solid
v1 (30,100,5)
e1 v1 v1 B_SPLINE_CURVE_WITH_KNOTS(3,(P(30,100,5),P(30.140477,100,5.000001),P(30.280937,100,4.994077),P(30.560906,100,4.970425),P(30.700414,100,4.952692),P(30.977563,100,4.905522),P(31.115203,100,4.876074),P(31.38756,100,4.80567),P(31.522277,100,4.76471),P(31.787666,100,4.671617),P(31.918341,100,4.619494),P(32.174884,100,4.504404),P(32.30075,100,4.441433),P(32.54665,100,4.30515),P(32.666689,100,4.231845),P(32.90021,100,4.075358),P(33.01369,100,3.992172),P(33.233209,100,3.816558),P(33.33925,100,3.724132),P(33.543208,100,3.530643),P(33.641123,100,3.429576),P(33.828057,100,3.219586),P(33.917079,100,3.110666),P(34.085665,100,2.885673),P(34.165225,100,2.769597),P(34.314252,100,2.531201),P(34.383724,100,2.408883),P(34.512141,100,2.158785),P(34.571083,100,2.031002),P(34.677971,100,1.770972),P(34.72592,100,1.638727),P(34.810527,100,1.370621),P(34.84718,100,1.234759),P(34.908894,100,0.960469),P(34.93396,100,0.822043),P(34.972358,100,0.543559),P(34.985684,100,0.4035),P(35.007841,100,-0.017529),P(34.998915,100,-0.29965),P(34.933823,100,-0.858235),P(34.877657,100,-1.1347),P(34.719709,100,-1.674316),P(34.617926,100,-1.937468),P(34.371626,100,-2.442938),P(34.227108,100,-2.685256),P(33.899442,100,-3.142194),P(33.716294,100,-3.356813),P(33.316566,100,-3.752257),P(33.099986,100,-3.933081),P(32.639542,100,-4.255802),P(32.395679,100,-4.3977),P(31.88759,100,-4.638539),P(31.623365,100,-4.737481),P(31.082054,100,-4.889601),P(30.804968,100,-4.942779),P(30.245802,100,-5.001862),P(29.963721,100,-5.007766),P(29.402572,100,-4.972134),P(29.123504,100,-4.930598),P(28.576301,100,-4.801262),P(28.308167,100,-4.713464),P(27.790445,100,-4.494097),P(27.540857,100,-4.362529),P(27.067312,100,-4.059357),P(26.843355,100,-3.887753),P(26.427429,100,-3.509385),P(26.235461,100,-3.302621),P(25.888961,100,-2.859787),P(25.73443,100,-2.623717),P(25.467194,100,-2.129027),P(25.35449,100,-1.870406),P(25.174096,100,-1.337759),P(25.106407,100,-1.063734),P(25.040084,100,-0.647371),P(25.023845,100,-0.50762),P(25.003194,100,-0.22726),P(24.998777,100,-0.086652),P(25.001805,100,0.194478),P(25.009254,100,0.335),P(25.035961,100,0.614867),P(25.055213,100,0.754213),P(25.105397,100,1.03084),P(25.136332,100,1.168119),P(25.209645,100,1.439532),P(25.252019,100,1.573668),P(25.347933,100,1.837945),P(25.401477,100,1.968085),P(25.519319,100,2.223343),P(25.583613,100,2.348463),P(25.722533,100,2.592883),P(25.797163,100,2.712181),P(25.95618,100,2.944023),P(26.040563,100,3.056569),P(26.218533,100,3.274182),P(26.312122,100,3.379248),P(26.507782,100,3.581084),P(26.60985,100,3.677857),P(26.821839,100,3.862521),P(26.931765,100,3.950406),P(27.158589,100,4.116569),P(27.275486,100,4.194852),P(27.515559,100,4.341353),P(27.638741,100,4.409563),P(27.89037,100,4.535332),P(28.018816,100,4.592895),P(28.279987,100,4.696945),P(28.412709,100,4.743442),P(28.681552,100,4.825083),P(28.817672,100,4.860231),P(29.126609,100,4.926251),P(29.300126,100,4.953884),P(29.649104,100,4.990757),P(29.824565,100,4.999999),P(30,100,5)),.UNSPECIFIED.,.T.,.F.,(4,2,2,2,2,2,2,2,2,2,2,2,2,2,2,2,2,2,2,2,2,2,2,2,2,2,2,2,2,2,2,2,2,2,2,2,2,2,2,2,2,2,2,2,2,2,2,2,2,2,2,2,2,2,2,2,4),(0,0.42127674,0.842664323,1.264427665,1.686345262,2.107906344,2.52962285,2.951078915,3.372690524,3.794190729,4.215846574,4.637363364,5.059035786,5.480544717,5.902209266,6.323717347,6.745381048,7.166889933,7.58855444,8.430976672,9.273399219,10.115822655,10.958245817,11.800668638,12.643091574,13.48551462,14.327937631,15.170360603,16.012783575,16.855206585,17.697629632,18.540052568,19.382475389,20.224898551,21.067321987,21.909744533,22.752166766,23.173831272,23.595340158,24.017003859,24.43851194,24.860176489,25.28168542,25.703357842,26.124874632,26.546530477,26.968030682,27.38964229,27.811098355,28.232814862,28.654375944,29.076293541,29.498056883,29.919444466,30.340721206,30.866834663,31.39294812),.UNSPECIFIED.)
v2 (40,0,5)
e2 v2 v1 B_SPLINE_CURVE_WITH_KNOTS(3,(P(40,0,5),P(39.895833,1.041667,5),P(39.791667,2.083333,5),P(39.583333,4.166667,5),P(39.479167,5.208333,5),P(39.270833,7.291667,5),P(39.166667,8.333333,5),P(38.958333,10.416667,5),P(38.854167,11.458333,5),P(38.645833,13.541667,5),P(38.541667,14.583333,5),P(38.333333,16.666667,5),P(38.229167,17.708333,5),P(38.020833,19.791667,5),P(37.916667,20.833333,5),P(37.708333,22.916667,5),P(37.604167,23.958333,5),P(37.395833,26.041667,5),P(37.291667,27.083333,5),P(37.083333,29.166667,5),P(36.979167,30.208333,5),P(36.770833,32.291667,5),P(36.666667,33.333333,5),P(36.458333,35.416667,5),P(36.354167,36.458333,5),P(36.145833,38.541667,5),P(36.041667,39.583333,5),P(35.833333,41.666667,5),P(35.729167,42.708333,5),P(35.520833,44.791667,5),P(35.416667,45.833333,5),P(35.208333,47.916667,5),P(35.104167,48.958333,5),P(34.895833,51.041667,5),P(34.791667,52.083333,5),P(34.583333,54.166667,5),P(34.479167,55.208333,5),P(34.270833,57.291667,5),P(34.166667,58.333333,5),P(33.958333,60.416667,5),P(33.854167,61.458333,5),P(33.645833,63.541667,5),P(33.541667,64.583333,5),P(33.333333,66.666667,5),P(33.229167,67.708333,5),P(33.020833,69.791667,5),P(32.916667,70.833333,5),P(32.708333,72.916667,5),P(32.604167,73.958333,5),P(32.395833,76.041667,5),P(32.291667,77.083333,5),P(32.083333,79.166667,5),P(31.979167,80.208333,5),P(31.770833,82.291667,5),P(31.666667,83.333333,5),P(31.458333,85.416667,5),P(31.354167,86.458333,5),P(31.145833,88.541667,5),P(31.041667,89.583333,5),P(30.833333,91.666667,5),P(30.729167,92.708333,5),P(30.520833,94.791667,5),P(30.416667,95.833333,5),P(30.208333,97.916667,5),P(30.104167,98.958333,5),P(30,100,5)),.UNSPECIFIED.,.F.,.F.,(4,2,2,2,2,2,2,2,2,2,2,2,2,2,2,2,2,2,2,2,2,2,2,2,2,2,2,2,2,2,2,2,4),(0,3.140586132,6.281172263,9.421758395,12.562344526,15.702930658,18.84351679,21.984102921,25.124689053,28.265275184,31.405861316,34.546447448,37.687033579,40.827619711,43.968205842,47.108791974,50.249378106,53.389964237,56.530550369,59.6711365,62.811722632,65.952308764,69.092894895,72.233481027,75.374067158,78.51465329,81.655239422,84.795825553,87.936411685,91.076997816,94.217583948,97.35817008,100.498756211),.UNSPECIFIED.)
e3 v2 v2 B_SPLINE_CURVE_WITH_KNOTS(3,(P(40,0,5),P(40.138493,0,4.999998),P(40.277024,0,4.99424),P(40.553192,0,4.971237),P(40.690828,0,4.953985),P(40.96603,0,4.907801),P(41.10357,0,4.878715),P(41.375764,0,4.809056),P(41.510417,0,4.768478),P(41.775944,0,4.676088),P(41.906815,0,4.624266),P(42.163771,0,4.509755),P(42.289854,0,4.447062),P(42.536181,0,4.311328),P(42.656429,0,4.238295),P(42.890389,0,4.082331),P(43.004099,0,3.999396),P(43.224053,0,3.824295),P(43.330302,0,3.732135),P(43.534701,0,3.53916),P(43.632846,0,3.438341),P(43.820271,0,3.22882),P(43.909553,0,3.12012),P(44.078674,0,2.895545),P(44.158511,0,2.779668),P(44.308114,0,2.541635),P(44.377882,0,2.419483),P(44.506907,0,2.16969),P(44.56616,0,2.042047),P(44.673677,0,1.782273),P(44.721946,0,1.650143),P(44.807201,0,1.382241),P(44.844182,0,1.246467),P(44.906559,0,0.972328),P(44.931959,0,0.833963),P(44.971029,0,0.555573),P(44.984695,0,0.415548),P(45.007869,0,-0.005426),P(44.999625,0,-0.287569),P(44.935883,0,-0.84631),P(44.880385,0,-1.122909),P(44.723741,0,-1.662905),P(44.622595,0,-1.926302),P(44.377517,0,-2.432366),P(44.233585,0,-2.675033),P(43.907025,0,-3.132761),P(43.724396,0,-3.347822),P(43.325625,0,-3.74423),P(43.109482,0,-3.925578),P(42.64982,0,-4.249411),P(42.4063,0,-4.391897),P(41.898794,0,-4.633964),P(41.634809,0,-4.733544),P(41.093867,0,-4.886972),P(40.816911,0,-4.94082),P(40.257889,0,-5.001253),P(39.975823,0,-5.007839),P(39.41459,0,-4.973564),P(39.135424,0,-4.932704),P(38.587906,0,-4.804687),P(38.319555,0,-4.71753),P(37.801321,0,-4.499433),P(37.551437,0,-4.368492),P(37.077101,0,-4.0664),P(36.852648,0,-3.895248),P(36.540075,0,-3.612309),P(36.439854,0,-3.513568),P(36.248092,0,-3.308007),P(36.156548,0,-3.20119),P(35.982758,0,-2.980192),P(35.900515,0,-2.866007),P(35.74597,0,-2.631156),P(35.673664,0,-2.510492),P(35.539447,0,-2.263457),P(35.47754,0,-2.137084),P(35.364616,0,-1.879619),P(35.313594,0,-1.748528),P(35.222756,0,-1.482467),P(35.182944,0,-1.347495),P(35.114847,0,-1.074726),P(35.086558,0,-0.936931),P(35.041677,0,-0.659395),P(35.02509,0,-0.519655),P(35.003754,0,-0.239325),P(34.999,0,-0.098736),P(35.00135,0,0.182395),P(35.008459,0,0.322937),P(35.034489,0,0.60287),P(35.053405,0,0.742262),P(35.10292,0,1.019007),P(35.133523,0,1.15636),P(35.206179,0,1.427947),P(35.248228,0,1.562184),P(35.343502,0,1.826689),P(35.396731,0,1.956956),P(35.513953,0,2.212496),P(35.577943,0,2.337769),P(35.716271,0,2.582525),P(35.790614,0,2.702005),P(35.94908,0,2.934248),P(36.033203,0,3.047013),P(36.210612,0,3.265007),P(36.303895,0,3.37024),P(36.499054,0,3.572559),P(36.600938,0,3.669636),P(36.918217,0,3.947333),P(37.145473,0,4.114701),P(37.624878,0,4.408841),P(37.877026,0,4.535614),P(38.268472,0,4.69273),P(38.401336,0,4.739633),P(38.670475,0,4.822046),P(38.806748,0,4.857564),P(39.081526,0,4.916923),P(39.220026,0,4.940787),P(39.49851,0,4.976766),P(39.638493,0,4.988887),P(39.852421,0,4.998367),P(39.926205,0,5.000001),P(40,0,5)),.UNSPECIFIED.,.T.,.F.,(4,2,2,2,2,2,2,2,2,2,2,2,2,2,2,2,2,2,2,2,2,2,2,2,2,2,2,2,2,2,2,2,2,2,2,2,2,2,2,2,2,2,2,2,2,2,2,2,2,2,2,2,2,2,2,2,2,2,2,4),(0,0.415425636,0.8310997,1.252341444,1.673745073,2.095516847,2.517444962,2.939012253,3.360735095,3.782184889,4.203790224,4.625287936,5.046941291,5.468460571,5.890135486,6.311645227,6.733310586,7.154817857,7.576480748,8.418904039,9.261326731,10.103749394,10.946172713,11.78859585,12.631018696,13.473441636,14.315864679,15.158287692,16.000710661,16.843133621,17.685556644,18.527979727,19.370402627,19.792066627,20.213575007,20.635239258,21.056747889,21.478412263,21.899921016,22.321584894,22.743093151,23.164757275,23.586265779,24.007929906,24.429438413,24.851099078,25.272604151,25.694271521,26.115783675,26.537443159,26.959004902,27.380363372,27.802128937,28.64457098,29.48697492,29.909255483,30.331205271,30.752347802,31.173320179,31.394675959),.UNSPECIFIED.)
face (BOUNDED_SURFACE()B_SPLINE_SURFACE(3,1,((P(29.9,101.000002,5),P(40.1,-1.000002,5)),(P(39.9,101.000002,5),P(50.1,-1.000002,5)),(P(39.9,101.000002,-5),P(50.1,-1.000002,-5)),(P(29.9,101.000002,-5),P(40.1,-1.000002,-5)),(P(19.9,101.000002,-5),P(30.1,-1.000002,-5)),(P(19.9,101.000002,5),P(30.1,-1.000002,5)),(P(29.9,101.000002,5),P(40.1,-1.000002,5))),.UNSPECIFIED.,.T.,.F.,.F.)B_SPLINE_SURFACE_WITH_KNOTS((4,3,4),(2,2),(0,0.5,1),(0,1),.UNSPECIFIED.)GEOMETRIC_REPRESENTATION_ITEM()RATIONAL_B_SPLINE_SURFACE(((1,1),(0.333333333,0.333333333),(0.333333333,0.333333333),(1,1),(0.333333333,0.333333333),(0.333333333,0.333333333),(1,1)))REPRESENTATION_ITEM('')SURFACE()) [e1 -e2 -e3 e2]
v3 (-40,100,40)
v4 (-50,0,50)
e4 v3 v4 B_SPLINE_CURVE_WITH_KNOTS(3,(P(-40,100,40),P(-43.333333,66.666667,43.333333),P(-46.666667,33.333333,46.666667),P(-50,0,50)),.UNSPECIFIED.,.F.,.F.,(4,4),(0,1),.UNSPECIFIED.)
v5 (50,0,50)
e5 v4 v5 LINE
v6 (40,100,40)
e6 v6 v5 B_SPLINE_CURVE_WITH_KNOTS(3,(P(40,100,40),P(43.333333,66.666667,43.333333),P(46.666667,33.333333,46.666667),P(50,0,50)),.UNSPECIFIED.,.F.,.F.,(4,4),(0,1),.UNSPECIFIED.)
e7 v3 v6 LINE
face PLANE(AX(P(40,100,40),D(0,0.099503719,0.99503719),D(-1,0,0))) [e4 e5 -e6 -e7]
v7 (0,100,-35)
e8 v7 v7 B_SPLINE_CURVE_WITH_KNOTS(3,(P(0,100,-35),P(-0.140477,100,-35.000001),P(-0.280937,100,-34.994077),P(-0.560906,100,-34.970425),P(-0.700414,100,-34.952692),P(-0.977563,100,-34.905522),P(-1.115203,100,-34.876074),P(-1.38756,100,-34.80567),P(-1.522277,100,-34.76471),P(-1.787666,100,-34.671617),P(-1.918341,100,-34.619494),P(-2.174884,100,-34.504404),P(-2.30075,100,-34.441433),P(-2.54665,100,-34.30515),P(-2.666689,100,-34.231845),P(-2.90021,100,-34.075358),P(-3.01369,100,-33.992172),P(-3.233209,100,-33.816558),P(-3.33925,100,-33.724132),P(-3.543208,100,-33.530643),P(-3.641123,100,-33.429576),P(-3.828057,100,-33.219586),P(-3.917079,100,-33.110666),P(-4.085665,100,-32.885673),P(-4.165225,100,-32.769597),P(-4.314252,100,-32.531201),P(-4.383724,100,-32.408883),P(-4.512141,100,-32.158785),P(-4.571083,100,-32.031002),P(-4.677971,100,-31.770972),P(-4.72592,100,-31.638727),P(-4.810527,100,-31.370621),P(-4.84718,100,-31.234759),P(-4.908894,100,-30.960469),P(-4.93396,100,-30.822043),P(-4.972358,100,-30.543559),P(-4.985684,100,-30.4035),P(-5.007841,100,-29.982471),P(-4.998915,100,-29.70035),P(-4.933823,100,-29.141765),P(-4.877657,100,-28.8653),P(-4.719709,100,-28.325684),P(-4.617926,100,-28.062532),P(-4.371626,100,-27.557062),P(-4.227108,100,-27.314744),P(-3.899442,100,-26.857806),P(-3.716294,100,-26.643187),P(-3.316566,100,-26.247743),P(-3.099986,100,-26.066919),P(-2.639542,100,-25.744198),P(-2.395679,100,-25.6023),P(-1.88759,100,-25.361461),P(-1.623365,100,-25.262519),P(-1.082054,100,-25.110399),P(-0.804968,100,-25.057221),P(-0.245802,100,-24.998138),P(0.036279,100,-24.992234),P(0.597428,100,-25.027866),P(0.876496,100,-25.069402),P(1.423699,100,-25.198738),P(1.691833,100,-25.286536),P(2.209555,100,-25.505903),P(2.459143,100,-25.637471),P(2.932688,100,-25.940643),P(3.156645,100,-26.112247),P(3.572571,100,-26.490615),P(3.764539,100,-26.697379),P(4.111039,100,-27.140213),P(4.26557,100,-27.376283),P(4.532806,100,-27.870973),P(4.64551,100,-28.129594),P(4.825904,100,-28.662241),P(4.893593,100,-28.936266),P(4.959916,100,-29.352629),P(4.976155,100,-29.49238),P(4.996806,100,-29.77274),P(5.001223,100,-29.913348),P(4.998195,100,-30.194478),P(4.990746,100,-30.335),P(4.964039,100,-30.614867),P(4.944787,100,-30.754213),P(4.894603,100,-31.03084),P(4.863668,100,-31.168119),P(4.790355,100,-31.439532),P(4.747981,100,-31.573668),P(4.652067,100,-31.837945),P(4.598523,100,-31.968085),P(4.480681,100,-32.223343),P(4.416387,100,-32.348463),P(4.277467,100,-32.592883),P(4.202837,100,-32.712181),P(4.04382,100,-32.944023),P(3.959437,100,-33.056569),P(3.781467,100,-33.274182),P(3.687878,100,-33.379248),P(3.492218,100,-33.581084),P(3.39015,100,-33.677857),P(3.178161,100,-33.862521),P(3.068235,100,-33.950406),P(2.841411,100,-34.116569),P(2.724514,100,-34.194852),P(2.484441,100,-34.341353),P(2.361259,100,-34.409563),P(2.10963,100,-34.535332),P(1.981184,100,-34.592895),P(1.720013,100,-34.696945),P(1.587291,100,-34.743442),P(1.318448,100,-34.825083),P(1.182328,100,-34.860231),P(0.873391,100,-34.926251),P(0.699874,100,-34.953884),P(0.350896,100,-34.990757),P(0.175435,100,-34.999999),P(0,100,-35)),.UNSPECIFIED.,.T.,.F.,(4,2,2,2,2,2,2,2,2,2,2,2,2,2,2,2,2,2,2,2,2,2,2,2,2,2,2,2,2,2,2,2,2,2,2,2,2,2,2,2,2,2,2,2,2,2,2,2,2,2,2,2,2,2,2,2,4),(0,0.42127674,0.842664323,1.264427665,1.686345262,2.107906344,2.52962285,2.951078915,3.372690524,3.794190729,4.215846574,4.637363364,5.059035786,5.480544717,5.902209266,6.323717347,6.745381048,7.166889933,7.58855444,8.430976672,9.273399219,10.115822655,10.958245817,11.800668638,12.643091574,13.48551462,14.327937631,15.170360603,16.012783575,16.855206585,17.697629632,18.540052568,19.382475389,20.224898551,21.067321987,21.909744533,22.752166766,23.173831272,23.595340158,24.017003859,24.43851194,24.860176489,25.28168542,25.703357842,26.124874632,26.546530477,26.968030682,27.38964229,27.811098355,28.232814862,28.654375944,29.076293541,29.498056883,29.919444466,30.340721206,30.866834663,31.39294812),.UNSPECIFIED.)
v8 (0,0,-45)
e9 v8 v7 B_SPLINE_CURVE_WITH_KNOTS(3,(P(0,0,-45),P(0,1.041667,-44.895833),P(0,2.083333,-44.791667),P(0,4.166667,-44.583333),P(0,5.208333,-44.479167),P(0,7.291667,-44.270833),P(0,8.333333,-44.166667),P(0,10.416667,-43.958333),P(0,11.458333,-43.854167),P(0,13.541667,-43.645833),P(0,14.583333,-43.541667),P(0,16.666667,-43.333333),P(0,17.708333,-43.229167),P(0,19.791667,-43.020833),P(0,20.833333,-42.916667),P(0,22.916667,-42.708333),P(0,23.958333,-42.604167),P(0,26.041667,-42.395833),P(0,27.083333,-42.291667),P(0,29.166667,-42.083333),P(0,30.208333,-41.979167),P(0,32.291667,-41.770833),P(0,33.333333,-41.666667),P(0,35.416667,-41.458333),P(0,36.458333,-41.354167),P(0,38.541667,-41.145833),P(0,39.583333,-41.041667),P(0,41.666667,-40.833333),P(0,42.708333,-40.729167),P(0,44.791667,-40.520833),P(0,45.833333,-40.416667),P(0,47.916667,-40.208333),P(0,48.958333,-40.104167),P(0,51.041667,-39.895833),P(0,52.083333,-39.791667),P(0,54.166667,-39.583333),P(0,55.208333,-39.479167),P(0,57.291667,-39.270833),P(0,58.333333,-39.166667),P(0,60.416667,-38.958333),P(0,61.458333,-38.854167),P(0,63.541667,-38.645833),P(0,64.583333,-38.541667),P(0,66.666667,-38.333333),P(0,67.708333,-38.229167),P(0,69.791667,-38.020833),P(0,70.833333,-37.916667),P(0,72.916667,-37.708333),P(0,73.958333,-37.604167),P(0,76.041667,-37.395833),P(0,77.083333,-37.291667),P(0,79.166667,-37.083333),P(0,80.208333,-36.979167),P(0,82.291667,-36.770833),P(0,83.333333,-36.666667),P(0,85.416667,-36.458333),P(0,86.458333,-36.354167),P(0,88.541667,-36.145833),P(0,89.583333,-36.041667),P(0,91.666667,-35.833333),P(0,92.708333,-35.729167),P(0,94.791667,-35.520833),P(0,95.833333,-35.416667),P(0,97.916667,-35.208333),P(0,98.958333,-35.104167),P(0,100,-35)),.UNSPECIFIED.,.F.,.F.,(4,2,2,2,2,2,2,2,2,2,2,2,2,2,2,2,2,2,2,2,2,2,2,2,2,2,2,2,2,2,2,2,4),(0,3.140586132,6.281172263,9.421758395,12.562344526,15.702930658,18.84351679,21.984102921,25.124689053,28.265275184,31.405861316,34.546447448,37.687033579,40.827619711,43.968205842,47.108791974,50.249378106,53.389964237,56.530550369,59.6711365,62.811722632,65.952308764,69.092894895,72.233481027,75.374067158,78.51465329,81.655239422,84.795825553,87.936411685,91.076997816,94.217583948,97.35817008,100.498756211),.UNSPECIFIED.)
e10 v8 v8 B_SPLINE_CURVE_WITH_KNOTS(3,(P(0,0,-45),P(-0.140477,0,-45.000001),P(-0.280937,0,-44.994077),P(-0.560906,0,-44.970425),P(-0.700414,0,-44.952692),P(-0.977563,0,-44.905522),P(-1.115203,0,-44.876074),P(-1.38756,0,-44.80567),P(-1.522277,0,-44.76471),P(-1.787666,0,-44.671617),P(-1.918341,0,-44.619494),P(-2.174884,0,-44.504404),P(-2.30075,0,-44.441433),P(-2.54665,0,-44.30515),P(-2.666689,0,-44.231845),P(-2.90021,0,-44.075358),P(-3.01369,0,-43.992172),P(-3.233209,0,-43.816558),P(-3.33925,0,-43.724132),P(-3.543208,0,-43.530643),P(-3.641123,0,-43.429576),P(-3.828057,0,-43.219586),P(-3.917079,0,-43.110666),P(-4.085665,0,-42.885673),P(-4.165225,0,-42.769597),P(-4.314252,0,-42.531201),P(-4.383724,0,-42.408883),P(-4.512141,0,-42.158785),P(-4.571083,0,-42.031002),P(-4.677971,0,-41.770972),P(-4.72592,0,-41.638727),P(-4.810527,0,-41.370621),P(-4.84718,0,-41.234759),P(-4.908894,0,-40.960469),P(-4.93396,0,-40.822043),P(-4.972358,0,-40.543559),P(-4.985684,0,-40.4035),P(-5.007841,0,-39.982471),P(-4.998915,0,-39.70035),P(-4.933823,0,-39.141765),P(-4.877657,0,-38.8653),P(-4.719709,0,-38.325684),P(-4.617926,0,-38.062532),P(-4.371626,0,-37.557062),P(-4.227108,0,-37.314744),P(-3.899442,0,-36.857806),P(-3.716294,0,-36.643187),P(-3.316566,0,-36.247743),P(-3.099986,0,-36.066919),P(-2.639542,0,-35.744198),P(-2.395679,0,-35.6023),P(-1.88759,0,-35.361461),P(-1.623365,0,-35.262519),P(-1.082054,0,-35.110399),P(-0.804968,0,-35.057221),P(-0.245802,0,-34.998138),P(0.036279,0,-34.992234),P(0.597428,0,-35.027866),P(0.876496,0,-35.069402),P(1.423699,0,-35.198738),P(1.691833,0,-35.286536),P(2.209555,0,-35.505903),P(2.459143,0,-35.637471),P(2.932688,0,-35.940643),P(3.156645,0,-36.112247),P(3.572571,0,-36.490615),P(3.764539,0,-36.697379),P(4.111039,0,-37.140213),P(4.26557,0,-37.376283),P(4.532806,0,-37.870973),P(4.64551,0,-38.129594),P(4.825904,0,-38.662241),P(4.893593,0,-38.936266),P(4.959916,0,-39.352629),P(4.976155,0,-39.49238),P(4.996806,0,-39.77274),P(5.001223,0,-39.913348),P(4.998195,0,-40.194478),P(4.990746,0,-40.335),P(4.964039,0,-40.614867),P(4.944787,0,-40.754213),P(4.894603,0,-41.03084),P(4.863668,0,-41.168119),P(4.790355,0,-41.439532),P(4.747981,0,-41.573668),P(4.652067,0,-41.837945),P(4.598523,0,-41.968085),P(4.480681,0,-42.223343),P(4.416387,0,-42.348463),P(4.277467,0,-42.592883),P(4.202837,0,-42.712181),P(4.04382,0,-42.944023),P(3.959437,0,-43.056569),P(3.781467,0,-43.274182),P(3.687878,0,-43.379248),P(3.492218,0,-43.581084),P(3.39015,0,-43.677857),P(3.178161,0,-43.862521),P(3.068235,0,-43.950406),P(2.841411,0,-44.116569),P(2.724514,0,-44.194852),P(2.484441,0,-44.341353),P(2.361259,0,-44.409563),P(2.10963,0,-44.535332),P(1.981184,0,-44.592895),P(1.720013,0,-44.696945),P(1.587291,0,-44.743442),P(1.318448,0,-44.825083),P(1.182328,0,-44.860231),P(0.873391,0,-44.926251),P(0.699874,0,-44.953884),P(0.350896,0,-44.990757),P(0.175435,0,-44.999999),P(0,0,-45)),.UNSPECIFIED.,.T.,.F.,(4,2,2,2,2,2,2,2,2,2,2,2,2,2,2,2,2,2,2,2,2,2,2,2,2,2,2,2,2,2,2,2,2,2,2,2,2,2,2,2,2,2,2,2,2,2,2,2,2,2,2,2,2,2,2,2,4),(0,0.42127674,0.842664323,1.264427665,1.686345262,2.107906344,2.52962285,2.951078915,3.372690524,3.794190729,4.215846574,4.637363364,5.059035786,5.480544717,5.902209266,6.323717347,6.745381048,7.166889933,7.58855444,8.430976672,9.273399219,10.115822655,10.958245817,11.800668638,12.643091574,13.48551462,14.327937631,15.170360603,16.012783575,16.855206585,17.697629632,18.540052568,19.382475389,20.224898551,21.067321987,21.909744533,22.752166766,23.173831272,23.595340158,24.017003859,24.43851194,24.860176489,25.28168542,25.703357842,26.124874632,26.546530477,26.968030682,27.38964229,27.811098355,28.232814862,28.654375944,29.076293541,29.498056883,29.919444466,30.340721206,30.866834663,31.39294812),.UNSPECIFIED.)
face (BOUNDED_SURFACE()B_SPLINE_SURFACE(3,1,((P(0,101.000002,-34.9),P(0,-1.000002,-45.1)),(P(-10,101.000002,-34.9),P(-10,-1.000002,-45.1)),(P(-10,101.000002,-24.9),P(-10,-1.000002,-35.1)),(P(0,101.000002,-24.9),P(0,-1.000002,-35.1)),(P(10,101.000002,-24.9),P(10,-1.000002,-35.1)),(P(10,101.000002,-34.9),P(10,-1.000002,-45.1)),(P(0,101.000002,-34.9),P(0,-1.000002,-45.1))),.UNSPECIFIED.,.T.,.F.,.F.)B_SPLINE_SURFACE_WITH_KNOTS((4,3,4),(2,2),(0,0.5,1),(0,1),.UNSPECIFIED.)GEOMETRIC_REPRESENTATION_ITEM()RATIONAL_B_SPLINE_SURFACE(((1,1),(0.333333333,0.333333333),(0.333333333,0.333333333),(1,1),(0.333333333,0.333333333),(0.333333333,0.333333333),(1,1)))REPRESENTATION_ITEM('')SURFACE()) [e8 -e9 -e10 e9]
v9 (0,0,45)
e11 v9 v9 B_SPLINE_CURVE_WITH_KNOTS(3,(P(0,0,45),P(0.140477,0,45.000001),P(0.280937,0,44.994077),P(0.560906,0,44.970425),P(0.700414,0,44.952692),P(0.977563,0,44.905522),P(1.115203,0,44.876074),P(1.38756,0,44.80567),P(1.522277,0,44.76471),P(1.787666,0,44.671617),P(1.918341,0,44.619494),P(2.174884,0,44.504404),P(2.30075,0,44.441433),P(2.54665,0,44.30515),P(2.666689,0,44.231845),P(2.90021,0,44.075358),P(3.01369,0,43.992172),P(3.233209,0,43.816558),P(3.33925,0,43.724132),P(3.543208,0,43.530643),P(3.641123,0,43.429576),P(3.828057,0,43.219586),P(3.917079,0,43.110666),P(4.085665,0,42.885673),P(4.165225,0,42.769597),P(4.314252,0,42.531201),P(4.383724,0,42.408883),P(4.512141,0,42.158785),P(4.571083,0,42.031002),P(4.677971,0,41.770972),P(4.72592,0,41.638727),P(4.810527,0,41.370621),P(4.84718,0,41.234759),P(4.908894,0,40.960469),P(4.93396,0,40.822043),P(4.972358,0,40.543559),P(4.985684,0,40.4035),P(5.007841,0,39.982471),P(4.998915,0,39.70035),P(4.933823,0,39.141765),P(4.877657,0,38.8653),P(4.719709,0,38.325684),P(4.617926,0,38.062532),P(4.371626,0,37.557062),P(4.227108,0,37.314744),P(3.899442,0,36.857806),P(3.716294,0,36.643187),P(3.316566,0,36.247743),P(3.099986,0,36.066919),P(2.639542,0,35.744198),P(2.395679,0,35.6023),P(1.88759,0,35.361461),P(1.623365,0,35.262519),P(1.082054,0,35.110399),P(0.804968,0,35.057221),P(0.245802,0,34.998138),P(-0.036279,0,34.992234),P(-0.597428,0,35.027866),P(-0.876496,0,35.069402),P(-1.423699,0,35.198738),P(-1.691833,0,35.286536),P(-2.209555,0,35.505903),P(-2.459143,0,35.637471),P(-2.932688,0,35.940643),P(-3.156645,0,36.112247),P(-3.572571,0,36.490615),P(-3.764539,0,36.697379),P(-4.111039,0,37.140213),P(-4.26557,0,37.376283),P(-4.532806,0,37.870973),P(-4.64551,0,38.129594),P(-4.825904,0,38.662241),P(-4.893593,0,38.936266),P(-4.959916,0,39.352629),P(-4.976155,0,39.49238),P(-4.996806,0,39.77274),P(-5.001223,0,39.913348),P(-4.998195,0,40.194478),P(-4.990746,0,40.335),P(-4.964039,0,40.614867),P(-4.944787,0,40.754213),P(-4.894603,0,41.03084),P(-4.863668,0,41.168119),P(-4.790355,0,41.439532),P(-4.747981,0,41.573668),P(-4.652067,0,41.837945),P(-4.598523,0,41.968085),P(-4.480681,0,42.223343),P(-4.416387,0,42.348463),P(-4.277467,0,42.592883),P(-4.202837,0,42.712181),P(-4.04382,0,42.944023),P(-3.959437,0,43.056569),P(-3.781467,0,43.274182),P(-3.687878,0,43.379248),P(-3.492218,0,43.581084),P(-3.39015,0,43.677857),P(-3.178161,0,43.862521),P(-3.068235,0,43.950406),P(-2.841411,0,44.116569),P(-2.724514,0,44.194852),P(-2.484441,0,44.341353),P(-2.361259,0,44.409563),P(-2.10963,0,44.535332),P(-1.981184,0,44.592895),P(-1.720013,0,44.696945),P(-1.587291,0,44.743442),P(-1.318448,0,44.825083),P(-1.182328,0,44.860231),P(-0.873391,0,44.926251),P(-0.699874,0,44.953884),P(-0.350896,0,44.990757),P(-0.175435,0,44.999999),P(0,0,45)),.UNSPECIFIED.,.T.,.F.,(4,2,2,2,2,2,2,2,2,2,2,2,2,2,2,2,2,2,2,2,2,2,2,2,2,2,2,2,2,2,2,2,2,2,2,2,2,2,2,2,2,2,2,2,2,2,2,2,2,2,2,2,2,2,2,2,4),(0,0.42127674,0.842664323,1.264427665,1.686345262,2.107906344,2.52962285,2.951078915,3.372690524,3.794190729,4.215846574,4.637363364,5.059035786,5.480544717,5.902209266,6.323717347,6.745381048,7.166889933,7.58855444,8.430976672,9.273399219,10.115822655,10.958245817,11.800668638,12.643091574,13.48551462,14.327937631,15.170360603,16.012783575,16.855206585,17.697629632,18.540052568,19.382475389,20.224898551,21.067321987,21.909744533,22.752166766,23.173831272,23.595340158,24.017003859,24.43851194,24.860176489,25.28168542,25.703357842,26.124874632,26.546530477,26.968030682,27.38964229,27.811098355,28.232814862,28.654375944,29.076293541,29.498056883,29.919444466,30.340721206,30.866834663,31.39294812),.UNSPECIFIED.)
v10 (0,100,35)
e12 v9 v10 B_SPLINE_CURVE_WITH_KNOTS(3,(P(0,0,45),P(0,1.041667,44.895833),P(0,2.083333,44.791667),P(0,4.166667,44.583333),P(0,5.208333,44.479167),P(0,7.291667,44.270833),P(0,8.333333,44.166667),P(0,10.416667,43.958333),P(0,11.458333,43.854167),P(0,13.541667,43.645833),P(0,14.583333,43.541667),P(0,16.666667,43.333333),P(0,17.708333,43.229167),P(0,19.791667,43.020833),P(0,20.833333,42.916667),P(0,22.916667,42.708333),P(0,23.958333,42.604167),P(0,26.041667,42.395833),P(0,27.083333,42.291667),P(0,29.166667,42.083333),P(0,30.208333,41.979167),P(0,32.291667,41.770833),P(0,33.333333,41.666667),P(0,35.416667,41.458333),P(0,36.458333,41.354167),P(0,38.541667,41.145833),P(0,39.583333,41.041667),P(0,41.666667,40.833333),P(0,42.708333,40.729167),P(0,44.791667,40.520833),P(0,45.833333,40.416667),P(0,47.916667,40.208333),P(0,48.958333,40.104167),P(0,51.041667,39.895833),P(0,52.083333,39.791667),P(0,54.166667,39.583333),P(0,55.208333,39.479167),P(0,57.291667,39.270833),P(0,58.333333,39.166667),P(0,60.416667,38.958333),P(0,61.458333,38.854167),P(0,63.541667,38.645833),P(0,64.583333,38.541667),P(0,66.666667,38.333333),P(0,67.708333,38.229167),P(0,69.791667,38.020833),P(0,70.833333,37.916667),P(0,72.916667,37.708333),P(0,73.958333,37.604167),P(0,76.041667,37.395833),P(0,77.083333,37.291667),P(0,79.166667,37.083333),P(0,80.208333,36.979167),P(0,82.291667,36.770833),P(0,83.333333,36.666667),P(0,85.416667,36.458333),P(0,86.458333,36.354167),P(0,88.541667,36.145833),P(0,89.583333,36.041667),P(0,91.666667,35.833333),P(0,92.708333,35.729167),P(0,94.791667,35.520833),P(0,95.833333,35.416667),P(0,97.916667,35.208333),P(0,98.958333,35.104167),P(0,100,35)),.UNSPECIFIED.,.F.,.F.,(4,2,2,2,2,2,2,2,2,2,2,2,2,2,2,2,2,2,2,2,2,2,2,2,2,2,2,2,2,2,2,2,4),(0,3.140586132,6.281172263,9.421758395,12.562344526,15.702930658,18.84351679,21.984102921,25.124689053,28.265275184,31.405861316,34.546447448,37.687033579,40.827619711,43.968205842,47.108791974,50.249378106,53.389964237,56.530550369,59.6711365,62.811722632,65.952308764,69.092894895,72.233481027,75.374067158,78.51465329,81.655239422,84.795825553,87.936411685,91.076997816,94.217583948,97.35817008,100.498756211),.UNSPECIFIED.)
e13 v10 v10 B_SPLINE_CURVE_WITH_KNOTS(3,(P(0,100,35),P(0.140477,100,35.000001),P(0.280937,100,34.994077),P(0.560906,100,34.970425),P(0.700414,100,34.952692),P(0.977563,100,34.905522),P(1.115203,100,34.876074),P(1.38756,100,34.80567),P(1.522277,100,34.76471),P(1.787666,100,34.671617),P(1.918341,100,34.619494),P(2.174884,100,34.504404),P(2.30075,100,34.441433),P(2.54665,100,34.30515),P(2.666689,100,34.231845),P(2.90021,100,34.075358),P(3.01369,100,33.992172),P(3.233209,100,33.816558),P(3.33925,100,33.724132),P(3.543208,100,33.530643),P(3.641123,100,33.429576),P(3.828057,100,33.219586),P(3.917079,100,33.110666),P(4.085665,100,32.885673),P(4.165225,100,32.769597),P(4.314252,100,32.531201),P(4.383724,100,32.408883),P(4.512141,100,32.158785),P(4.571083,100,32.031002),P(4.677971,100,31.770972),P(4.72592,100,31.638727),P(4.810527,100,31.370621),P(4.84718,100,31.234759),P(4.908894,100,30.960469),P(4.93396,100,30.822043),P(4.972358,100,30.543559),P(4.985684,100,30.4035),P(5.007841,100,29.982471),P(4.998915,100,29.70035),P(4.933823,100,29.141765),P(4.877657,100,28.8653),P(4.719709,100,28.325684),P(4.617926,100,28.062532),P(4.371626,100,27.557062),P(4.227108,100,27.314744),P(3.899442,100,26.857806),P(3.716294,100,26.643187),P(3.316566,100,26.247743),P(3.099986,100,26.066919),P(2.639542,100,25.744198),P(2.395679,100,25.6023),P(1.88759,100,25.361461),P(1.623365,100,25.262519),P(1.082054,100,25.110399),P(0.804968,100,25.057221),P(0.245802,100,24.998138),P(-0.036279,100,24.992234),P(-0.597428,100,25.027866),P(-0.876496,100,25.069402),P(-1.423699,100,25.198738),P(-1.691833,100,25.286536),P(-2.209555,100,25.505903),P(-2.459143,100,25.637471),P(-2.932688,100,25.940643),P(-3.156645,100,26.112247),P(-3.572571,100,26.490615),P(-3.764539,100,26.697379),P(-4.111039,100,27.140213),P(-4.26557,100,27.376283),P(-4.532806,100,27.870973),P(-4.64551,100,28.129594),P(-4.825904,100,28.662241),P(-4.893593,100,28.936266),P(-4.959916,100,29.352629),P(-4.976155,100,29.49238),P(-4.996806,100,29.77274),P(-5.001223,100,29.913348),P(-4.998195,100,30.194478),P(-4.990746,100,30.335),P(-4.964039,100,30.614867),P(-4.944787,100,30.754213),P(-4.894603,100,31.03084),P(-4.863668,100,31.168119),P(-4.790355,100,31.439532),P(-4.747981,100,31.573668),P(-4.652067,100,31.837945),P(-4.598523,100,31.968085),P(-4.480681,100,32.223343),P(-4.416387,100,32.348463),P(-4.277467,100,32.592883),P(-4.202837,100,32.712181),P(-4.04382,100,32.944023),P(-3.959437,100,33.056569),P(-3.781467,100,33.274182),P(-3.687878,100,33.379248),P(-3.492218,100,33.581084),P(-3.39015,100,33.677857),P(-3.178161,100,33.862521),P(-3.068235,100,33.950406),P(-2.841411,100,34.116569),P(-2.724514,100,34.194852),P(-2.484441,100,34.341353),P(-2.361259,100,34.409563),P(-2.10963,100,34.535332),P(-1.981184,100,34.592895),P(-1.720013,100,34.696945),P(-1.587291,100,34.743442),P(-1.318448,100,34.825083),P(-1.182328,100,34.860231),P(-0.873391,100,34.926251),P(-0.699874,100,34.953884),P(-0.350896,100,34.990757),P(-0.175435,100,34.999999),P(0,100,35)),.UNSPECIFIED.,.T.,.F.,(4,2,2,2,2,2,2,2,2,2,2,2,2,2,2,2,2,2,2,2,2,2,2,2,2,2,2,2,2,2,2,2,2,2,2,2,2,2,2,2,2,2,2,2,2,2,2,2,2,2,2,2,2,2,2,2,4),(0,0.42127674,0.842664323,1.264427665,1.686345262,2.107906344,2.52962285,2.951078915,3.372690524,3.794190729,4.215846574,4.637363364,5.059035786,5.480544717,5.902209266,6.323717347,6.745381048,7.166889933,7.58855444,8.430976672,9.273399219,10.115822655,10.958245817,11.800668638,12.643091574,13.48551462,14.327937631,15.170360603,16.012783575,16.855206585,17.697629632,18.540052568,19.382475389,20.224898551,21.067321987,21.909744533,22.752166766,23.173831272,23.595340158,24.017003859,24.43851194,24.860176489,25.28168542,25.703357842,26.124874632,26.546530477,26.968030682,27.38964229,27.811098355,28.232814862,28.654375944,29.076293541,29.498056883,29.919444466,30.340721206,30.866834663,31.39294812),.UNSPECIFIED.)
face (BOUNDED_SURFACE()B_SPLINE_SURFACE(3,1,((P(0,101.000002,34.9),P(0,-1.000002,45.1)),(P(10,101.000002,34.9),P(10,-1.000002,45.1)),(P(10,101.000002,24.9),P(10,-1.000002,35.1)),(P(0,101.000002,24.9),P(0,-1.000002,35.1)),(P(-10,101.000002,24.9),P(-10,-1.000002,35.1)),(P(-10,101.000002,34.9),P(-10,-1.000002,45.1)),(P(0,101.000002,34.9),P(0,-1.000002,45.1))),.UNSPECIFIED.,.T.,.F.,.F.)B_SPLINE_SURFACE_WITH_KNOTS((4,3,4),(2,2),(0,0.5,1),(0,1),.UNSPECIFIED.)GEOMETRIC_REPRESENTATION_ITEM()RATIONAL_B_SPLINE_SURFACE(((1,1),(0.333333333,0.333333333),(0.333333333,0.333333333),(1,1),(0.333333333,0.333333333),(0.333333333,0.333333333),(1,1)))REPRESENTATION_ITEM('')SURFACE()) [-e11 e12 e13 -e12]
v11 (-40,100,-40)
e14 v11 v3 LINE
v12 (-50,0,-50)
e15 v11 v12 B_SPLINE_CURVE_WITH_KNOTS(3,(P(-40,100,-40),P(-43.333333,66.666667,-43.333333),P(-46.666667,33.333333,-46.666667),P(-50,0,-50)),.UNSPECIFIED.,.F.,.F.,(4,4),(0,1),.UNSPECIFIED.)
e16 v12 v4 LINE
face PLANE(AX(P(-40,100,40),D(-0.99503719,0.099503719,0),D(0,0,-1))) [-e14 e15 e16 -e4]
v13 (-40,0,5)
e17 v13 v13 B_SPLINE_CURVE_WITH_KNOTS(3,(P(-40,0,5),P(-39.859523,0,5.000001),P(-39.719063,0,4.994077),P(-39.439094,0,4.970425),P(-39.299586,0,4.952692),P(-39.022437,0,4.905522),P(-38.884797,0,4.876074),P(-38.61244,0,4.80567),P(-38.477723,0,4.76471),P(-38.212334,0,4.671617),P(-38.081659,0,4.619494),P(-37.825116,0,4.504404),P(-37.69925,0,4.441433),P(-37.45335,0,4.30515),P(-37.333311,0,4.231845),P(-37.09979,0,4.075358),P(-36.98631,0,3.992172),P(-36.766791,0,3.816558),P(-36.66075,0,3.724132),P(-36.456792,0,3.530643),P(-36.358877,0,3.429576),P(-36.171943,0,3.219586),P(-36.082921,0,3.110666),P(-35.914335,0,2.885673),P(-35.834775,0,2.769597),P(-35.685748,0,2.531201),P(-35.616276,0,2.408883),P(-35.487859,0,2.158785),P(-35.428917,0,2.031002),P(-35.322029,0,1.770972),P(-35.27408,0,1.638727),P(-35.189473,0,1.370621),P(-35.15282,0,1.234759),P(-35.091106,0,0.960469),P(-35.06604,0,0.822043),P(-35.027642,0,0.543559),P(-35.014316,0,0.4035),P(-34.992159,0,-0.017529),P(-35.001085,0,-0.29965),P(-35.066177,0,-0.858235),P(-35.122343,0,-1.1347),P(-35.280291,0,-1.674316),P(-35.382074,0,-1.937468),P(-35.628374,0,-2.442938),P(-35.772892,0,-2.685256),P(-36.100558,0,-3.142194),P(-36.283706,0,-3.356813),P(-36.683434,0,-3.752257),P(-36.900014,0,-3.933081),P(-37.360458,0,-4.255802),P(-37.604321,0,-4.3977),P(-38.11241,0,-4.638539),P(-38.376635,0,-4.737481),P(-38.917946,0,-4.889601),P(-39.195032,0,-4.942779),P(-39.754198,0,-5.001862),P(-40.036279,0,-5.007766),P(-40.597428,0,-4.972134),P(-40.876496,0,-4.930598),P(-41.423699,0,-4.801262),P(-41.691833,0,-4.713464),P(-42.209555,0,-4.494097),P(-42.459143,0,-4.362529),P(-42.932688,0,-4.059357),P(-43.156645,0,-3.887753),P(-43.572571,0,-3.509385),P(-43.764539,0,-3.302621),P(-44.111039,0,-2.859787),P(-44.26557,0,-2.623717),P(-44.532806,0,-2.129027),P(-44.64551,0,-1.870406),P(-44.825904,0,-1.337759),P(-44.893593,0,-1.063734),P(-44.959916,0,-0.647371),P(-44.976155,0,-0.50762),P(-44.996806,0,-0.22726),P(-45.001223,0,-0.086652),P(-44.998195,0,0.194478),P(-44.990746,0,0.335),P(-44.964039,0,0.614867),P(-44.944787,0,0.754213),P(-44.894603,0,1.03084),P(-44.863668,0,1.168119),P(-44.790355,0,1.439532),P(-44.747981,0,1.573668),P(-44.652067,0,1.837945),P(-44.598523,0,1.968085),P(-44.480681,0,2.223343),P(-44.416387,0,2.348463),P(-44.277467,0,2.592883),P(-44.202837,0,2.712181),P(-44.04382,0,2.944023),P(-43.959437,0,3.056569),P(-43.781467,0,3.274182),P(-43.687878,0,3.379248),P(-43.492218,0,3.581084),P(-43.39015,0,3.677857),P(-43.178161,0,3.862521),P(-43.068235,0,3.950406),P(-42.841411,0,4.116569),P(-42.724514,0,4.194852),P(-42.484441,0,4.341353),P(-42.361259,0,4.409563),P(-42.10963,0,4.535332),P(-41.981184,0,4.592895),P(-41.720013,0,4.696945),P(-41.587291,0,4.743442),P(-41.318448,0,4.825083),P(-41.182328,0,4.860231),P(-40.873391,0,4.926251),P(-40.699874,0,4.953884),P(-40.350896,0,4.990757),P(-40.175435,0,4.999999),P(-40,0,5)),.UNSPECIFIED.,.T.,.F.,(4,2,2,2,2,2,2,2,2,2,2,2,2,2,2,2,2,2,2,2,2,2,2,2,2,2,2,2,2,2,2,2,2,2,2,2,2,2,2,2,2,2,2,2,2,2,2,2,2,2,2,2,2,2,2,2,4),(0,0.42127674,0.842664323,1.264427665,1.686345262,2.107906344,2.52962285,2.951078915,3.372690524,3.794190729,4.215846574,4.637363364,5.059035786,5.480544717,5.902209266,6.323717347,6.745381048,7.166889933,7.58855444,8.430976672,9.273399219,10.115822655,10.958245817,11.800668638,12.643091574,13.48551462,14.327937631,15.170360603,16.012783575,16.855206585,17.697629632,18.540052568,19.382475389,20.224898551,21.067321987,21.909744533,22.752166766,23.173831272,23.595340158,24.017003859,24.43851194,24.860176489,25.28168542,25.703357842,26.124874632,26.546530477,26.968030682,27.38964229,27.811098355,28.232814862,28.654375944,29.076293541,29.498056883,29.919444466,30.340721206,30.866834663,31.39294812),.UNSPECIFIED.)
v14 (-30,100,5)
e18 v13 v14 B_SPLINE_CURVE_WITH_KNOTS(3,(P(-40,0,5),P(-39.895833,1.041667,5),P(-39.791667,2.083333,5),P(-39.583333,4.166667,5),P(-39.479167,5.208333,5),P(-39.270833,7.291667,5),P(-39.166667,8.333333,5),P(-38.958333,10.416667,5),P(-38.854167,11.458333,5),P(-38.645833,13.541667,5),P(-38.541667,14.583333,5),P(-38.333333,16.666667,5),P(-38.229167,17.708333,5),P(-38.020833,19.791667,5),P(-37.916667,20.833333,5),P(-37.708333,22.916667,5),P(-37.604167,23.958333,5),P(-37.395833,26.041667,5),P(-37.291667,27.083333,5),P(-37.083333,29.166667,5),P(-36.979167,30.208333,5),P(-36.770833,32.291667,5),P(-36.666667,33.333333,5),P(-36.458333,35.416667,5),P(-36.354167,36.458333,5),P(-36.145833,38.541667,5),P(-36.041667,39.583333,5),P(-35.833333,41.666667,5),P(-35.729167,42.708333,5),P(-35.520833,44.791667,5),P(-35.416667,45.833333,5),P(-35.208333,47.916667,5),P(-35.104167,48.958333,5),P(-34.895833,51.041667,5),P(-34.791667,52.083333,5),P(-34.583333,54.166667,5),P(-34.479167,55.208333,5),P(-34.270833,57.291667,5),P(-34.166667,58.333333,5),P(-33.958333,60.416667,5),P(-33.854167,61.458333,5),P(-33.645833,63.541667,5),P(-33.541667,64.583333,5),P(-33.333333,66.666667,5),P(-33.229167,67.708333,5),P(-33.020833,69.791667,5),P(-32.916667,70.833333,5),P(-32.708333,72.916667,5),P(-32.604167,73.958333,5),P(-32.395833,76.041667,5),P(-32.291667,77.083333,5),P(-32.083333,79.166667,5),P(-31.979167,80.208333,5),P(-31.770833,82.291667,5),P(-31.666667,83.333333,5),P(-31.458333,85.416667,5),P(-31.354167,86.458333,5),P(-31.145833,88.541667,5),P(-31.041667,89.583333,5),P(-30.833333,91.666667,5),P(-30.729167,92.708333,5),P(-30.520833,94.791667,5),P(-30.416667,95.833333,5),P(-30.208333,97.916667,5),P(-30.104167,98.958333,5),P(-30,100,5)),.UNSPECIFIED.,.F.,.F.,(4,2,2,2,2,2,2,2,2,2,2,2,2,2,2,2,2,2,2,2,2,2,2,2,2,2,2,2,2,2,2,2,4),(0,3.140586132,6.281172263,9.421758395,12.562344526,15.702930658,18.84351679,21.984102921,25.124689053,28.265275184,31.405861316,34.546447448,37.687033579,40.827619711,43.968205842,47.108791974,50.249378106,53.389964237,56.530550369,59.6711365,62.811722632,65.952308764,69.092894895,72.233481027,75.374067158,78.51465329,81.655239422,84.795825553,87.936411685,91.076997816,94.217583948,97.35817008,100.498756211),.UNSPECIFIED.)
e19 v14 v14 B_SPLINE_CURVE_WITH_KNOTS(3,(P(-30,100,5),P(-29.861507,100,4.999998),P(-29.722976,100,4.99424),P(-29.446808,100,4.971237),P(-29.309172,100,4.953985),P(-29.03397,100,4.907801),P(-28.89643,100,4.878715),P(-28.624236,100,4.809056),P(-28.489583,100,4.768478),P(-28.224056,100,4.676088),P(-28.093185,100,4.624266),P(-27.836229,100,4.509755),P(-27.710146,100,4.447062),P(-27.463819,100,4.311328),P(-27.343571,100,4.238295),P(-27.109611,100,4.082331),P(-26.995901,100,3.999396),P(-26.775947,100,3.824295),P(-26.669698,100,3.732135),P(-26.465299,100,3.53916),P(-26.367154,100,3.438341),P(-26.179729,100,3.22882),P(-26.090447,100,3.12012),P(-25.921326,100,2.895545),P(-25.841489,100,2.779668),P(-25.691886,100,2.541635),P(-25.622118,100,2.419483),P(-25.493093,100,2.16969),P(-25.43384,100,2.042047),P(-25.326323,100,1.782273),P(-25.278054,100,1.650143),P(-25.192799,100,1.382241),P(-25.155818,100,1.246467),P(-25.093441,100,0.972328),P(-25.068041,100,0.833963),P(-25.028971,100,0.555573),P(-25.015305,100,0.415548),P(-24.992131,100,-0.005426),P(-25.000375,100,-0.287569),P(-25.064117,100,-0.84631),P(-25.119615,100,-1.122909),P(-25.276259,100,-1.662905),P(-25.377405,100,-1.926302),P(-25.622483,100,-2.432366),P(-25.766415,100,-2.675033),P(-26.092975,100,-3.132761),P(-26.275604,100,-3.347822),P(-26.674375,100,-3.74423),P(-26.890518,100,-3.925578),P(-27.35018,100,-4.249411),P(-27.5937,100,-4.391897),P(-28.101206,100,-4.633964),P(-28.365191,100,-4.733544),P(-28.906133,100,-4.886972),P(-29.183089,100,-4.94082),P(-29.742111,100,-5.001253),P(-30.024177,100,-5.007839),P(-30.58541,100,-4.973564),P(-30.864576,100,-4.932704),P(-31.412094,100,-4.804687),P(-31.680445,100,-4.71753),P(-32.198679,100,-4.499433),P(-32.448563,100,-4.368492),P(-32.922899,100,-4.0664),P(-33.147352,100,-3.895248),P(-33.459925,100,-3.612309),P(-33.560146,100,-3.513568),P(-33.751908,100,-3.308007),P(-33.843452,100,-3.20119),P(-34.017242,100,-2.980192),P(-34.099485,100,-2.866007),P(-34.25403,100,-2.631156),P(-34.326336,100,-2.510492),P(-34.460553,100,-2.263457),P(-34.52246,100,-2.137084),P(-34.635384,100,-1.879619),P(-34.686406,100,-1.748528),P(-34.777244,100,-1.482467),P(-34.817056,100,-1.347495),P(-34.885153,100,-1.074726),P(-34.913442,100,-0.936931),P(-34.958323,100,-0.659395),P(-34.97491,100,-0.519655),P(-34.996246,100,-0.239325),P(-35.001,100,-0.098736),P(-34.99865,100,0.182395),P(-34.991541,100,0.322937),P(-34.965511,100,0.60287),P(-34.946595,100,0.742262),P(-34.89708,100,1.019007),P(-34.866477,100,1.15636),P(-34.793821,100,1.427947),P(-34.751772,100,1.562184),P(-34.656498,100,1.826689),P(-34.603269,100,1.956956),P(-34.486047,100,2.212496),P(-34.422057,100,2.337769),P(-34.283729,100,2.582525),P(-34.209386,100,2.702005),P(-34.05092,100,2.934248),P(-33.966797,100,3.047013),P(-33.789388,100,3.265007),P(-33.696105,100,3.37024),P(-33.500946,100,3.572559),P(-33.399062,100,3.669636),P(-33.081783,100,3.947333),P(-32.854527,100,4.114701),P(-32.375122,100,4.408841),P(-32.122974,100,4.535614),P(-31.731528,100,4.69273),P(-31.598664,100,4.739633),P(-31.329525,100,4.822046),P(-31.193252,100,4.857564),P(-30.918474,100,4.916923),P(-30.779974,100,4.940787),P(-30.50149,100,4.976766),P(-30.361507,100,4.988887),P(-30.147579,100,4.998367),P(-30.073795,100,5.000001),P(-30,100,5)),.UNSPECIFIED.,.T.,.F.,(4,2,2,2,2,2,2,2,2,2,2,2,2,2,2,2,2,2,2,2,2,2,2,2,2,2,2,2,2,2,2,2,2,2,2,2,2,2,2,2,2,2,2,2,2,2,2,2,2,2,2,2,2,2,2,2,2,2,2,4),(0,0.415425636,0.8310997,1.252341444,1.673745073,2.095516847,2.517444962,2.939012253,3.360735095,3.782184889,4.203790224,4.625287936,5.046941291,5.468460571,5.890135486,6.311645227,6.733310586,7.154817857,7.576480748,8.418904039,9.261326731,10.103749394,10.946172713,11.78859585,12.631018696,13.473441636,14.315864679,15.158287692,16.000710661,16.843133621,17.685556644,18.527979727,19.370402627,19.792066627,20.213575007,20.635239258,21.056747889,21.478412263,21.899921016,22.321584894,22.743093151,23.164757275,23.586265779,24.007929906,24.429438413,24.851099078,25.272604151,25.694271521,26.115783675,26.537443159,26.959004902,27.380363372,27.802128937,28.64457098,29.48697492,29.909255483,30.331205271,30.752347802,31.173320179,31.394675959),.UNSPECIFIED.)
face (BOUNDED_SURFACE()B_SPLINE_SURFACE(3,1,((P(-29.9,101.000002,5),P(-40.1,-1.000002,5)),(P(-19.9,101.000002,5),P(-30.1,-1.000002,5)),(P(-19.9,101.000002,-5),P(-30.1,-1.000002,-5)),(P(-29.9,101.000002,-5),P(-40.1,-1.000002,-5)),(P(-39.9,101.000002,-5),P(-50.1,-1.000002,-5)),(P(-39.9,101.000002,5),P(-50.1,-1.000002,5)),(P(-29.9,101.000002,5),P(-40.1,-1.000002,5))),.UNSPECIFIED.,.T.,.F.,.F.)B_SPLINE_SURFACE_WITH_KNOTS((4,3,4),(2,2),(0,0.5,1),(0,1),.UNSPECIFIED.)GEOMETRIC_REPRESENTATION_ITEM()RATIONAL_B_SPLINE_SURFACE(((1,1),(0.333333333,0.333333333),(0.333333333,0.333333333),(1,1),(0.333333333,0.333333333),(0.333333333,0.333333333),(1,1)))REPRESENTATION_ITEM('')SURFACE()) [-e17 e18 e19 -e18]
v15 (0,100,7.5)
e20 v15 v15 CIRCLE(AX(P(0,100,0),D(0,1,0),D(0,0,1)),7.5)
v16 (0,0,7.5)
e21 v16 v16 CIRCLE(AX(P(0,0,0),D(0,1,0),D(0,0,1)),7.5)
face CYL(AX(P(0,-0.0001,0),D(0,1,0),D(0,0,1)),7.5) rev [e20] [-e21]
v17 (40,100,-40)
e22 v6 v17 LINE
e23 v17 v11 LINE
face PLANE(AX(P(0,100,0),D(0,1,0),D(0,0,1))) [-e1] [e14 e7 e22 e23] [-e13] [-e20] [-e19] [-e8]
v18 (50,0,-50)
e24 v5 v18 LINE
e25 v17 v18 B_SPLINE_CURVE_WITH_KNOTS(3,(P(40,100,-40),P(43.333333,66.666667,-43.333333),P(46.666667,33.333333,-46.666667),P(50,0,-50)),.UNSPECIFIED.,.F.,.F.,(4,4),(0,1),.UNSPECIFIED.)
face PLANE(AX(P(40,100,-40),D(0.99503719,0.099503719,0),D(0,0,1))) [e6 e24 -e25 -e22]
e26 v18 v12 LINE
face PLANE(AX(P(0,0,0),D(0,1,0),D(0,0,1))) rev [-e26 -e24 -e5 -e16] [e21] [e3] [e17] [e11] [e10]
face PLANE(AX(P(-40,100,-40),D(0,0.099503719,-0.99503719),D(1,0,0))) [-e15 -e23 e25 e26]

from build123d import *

# Parameters (mm, degrees)
LOFT1_OUTLINE_W    = 80
LOFT1_OUTLINE_H    = 80
LOFT1_DEPTH        = 100
LOFT1_DRAFT        = 5.7105931
SKETCH4_R          = 7.5
CUT_EXTRUDE1_DEPTH = 123.474487085
SKETCH7_R          = 5
SKETCH9_R          = 5


# Read off the part's stored shape, not the designer's step: Loft1
with BuildPart() as part:
    # Loft1 outline → Loft1 (with draft: the straight prism first)
    with BuildSketch(Plane(origin=(0, 100, 0), x_dir=(1, 0, 0), z_dir=(0, 1, 0))):
        Rectangle(LOFT1_OUTLINE_W, LOFT1_OUTLINE_H)
    extrude(amount=-LOFT1_DEPTH)
    # Loft1: the draft: its side faces are tilted about the plane it starts from
    loft1_sides = [part.faces().sort_by_distance(p)[0] for p in [
        (40, 50, 0),
        (0, 50, -40),
        (-40, 50, 0),
        (0, 50, 40),
    ]]
    draft(loft1_sides, Plane(origin=(0, 100, 0), x_dir=(1, 0, 0), z_dir=(0, 1, 0)), LOFT1_DRAFT)

    # Sketch4 → Cut-Extrude1 (cut, through all)
    with BuildSketch(Plane(origin=(0, 100, 0), x_dir=(1, 0, 0), z_dir=(0, 1, 0))):
        with Locations(Location((0, 0, 0), (0, 0, 270))):
            Circle(SKETCH4_R)
    extrude(amount=-CUT_EXTRUDE1_DEPTH, mode=Mode.SUBTRACT)

    # Cut-Sweep1: sweep along a path in Sketch8
    with BuildLine(Plane.XY) as cut_sweep1_path:
        Line((-30, 100), (-40, 0))
    # Sketch7 → Cut-Sweep1 (sweep, cut)
    with BuildSketch(Plane(origin=(0, 100, 0), x_dir=(1, 0, 0), z_dir=(0, 1, 0))):
        with Locations((-30, 0)):
            Circle(SKETCH7_R)
    cut_sweep1 = sweep(path=cut_sweep1_path.line, mode=Mode.SUBTRACT)

    # Mirror1: Cut-Sweep1 across plane
    add(cut_sweep1.mirror(Plane(origin=(0, 0, 0), x_dir=(0, 0, 1), z_dir=(1, 0, 0))), mode=Mode.SUBTRACT)

    # Cut-Sweep2: sweep along a path in Sketch10
    with BuildLine(Plane(origin=(0, 0, 0), x_dir=(0, 0, -1), z_dir=(1, 0, 0))) as cut_sweep2_path:
        Line((-30, 100), (-40, 0))
    # Sketch9 → Cut-Sweep2 (sweep, cut)
    with BuildSketch(Plane(origin=(0, 100, 0), x_dir=(1, 0, 0), z_dir=(0, 1, 0))):
        with Locations((0, -30)):
            Circle(SKETCH9_R)
    cut_sweep2 = sweep(path=cut_sweep2_path.line, mode=Mode.SUBTRACT)

    # Mirror2: Cut-Sweep2 across plane
    add(cut_sweep2.mirror(Plane.XY), mode=Mode.SUBTRACT)


solid = part.part
